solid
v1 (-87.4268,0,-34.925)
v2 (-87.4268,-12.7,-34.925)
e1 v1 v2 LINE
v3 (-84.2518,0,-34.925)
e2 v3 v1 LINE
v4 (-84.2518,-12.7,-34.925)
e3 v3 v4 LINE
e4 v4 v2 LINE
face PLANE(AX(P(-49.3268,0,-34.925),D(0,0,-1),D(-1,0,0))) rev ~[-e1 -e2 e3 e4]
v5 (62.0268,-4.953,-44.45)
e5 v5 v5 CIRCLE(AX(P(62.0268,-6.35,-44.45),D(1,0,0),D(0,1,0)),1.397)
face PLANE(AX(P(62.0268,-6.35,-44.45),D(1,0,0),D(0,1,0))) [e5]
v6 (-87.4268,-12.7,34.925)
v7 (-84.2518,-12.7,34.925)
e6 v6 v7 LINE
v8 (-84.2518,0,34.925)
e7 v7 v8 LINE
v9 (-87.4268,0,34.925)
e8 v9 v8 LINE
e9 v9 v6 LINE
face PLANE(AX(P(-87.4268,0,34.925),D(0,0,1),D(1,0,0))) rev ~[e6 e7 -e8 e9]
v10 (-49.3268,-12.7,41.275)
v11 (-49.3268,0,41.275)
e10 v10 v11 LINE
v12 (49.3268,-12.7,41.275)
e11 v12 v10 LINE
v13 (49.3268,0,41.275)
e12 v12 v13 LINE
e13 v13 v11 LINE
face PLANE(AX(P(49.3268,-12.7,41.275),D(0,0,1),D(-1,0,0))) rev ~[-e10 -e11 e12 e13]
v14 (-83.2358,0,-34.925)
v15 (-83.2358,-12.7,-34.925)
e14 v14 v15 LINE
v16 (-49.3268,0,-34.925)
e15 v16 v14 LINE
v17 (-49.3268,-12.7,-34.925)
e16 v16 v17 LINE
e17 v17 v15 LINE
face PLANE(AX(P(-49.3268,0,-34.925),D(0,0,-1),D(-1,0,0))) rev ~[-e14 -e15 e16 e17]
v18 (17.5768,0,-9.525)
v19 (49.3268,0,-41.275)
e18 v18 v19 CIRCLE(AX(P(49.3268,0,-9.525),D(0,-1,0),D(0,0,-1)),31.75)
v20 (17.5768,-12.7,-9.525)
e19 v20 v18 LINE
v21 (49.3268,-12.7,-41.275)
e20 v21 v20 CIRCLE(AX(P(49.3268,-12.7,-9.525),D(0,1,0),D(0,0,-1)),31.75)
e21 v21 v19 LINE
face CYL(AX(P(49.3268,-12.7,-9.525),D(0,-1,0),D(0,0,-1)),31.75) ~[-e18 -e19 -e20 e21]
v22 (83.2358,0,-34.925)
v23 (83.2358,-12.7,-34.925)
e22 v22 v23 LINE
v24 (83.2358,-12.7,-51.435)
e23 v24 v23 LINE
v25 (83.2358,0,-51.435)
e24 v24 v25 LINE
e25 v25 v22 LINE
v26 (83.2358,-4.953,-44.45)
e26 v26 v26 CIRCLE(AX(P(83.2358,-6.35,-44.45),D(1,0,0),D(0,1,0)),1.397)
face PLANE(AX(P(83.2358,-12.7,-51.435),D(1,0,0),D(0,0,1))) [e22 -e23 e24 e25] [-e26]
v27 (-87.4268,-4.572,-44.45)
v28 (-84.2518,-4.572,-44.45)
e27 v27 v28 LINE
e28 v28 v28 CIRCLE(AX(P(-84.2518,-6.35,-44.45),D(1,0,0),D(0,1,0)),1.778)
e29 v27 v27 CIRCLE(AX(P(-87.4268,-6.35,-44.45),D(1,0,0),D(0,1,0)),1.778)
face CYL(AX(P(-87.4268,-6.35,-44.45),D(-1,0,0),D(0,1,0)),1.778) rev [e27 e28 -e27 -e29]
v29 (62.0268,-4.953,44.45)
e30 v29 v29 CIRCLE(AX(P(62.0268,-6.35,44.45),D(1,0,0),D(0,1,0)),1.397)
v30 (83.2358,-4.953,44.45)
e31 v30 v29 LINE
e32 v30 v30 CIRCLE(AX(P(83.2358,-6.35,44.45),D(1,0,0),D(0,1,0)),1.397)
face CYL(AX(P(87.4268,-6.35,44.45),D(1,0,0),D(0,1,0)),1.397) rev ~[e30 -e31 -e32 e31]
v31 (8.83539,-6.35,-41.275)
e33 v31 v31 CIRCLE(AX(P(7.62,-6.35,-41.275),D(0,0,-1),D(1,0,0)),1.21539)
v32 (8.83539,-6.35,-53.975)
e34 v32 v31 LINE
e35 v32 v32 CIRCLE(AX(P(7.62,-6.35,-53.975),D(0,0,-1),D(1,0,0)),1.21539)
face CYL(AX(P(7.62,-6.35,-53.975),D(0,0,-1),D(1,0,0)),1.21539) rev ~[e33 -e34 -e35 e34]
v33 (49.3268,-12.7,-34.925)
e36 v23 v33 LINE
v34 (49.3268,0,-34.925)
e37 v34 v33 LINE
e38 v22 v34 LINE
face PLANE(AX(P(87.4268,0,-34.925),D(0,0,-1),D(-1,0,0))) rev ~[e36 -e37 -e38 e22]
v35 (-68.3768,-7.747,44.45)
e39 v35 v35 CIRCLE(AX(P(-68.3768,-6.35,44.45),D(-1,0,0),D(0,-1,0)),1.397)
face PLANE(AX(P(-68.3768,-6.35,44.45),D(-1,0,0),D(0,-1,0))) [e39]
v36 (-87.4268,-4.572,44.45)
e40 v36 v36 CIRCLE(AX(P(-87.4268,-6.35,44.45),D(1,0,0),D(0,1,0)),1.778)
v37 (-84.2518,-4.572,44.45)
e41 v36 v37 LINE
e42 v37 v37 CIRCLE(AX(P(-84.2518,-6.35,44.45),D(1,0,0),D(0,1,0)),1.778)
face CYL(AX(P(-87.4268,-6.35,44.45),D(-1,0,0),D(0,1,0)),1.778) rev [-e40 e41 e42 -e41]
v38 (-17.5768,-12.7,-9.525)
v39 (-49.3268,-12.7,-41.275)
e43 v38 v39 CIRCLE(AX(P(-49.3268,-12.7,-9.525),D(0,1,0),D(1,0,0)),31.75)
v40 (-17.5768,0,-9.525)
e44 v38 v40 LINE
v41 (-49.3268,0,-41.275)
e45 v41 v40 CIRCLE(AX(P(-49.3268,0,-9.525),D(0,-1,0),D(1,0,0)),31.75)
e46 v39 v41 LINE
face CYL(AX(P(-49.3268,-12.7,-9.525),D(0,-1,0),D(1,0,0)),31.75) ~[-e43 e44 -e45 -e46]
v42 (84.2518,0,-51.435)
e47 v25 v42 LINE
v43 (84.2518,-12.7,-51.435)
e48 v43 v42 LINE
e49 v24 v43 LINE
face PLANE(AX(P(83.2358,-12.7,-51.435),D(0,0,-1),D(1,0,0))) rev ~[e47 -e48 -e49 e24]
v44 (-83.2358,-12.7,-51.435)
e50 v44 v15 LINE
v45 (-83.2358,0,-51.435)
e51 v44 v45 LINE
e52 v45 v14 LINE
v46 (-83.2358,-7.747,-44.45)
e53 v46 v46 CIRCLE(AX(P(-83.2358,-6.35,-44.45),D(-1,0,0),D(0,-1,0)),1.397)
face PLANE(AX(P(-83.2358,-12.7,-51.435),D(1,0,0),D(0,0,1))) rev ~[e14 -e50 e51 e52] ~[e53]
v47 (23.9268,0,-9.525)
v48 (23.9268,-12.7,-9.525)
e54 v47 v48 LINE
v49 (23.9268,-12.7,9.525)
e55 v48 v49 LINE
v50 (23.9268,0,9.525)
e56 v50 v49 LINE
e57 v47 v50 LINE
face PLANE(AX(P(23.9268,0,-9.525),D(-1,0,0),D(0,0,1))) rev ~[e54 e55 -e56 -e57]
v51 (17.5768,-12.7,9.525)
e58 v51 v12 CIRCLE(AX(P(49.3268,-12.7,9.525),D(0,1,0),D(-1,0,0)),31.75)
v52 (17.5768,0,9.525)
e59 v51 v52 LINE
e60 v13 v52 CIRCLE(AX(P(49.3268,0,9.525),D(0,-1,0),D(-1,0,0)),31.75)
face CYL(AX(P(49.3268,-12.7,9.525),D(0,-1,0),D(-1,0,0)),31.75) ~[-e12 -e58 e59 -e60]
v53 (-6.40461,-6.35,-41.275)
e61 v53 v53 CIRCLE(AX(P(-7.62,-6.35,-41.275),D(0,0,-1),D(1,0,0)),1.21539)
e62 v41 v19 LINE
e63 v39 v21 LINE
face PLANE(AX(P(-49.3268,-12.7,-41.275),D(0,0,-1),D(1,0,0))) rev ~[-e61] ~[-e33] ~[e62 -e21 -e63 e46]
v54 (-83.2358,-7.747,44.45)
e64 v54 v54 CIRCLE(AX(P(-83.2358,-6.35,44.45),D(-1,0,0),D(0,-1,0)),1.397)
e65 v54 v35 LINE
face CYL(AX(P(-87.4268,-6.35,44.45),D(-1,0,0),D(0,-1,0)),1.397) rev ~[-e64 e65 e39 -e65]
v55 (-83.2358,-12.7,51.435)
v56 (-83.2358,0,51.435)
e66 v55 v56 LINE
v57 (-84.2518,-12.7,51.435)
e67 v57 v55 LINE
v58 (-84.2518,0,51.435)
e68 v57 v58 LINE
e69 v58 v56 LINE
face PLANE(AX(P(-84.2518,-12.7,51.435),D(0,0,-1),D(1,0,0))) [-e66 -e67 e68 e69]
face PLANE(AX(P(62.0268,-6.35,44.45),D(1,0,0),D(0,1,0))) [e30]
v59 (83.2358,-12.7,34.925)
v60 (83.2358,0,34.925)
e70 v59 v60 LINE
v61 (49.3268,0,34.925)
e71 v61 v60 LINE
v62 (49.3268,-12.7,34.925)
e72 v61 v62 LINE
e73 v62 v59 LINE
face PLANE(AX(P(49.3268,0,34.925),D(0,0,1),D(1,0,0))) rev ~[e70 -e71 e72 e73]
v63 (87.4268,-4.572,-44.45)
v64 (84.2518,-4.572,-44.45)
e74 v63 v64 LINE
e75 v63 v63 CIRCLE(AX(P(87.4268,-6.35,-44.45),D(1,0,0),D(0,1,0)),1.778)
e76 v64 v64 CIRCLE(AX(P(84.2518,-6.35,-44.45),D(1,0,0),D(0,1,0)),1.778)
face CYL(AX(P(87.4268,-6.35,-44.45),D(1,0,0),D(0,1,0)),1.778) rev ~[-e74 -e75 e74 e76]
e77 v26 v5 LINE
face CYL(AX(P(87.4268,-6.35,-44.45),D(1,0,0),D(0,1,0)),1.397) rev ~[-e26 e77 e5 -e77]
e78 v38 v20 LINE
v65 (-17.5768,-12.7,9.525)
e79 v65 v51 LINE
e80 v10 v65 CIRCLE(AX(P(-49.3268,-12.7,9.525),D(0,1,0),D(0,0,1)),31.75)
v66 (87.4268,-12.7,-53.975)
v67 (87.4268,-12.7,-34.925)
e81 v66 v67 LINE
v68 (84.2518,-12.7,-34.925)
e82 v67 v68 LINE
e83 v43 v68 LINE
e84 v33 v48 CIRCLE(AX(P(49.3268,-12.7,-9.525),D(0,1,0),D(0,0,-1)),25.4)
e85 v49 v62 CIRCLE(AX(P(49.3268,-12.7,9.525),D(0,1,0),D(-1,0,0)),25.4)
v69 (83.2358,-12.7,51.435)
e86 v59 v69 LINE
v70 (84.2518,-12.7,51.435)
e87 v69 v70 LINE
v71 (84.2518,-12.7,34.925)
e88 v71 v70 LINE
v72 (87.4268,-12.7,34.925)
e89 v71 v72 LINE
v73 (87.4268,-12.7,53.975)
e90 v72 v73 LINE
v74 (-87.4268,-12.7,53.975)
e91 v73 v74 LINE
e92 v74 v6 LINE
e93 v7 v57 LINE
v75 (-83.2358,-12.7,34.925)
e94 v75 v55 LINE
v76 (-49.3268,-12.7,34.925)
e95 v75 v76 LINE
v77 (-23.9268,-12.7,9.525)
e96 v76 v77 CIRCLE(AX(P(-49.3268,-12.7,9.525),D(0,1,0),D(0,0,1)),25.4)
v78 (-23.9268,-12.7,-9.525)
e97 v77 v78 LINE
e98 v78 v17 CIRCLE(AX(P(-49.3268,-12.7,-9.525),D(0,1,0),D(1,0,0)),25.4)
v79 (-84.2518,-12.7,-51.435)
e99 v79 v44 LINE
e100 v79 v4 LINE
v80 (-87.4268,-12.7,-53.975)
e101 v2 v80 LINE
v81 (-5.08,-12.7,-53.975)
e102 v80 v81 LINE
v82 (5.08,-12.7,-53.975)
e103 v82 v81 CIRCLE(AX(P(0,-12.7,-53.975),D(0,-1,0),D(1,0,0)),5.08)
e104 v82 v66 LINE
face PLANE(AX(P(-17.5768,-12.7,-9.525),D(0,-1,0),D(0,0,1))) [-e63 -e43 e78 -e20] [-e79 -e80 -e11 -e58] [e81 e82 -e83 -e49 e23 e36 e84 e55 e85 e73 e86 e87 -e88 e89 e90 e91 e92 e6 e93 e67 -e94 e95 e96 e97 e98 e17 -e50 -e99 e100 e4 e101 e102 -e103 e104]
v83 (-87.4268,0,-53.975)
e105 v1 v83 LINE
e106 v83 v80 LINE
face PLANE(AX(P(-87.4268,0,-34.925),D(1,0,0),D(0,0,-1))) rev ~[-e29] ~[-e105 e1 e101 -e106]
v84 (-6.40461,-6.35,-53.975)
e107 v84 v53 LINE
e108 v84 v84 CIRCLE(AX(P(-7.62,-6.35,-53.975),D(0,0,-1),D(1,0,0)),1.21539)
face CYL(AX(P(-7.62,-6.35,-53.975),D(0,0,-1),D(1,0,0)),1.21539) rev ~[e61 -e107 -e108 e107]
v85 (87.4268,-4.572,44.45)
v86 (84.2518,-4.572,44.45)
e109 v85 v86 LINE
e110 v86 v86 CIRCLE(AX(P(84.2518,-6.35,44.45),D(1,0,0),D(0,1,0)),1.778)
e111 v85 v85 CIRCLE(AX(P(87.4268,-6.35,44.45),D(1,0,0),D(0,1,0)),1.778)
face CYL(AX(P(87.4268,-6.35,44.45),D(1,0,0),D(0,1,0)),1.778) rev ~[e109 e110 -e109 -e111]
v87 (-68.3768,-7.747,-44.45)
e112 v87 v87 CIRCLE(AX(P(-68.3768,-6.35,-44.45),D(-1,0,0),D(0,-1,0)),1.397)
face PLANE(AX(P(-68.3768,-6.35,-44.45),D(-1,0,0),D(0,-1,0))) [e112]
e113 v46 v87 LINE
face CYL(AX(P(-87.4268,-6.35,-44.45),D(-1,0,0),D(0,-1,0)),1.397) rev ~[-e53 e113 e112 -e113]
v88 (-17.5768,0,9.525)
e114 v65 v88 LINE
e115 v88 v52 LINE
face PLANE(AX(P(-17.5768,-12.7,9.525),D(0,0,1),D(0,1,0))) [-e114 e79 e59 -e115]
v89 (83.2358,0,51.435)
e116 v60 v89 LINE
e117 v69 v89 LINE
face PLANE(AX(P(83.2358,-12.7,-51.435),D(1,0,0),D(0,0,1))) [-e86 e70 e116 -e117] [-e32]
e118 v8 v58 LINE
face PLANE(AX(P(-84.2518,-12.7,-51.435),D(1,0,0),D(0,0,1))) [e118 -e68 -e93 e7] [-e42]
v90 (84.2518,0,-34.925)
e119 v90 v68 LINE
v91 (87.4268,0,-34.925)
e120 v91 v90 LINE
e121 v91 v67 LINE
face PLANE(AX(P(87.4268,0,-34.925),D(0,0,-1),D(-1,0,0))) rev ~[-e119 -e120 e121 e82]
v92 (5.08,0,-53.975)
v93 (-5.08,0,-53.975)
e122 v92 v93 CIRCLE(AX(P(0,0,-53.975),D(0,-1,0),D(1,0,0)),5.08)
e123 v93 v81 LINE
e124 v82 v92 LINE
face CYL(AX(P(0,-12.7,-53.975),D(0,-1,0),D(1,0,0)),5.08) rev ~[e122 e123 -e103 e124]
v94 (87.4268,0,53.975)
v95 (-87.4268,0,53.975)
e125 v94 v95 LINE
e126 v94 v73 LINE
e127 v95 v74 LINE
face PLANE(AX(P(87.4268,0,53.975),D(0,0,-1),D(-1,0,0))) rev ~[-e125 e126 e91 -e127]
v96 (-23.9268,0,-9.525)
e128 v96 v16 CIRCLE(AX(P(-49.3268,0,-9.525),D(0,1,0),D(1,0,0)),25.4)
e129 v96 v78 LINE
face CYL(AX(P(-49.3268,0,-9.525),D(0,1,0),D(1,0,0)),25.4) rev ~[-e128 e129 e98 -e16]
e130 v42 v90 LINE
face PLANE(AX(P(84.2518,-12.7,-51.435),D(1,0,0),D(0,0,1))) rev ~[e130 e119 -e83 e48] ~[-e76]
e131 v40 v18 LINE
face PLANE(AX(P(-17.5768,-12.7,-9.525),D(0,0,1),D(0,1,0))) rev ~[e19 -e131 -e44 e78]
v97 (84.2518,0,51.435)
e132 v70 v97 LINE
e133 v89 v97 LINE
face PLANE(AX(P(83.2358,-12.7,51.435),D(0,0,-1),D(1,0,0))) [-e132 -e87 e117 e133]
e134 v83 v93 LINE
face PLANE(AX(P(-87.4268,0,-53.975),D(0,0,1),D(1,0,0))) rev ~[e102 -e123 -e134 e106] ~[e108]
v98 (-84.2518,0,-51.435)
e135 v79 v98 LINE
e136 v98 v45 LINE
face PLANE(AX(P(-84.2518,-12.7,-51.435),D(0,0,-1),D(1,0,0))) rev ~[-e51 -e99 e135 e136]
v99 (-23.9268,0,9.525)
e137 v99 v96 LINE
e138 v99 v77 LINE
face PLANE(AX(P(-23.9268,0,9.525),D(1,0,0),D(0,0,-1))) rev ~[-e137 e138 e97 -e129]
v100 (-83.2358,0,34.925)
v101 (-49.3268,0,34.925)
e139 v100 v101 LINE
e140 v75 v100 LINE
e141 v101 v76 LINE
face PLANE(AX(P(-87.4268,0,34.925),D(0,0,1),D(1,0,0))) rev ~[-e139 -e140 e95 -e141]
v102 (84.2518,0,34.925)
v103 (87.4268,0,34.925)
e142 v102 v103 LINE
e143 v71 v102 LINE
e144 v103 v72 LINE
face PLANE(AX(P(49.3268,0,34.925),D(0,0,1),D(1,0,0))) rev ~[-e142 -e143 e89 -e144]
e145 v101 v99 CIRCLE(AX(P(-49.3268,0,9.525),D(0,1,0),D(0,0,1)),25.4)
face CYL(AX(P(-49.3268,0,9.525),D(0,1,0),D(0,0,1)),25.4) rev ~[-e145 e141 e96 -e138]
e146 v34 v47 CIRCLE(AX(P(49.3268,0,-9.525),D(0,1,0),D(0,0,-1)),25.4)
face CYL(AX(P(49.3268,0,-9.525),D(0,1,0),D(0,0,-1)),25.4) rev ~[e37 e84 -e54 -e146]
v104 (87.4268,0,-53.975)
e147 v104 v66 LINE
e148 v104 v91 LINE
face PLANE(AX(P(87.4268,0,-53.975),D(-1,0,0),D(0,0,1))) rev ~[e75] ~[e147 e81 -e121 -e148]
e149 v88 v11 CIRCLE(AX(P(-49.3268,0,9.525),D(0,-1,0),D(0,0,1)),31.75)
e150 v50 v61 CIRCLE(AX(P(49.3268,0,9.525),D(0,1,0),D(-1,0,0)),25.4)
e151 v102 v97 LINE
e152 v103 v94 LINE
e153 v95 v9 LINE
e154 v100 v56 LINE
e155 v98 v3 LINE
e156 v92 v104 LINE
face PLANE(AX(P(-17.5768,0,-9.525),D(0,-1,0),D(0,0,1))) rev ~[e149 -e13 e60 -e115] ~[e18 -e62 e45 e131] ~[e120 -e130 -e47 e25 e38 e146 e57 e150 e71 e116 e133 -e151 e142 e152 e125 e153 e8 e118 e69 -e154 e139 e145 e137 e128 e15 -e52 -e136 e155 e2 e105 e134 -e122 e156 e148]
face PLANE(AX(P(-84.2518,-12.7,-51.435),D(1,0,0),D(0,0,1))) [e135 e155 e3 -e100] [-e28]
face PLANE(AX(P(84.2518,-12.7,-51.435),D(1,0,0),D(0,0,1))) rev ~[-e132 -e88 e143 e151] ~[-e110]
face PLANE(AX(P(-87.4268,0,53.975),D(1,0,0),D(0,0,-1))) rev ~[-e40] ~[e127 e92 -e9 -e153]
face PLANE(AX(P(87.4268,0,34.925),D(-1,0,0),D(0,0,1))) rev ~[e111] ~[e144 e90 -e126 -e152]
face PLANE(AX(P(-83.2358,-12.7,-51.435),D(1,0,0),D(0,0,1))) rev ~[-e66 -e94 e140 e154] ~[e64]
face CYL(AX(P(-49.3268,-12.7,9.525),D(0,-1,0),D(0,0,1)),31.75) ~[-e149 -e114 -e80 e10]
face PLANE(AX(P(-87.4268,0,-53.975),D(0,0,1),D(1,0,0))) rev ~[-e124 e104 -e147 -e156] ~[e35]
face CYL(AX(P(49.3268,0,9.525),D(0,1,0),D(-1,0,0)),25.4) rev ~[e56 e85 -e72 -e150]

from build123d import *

# Parameters (mm, degrees)
F1_DEPTH  = 12.7
F2_W      = 1.016
F2_H      = 102.87
F3_DEPTH  = 25.4
F4_R      = 5.08
F5_DEPTH  = 25.4
F6_R      = 1.21539
F7_DEPTH  = 25.4
F8_R      = 1.397
F9_DEPTH  = 25.4
F10_R     = 1.397
F11_DEPTH = 19.05
F12_R     = 1.778
F13_DEPTH = 3.175
F15_DEPTH = 25.4
F16_W     = 12.7
F16_H     = 19.05
F17_DEPTH = 38.1


# Not quite as in the source:
# - a pattern or mirror of a feature is missing from the dataset's text; its kind, count and spacing are read off the source's solid


with BuildPart() as f1:
    # F0 (on Front) → F1 (new body)
    with BuildSketch(Plane.XZ):
        with BuildLine():
            Line((87.4268, 34.925), (87.4268, 53.975))
            Line((87.4268, 53.975), (0, 53.975))
            Line((0, 53.975), (-87.4268, 53.975))
            Line((-87.4268, 53.975), (-87.4268, 34.925))
            Line((-87.4268, 34.925), (-49.3268, 34.925))
            ThreePointArc((-49.3268, 34.925), (-31.3662877579, 27.4855122421), (-23.9268, 9.525))
            Line((-23.9268, 9.525), (-23.9268, -9.525))
            ThreePointArc((-23.9268, -9.525), (-31.3662877579, -27.4855122421), (-49.3268, -34.925))
            Line((-49.3268, -34.925), (-87.4268, -34.925))
            Line((-87.4268, -34.925), (-87.4268, -53.975))
            Line((-87.4268, -53.975), (87.4268, -53.975))
            Line((87.4268, -53.975), (87.4268, -34.925))
            Line((87.4268, -34.925), (49.3268, -34.925))
            ThreePointArc((49.3268, -34.925), (31.3662877579, -27.4855122421), (23.9268, -9.525))
            Line((23.9268, -9.525), (23.9268, 9.525))
            ThreePointArc((23.9268, 9.525), (31.3662877579, 27.4855122421), (49.3268, 34.925))
            Line((49.3268, 34.925), (87.4268, 34.925))
        make_face()
    extrude(amount=F1_DEPTH)

    # F2 (on face) → F3 (cut)
    with BuildSketch(Plane.XZ.offset(12.7)):
        with Locations((-83.7438, 0)):
            Rectangle(F2_W, F2_H)
        with Locations((83.7438, 0)):
            Rectangle(F2_W, F2_H)
    extrude(amount=-F3_DEPTH, mode=Mode.SUBTRACT)

    # F4 (on face) → F5 (cut)
    with BuildSketch(Plane.XZ.offset(12.7)):
        with Locations((0, -53.975)):
            Circle(F4_R)
    extrude(amount=-F5_DEPTH, mode=Mode.SUBTRACT)

    # F6 (on face) → F7 (cut)
    with BuildSketch(Plane(origin=(0, 0, -53.975), x_dir=(1, 0, 0), z_dir=(0, 0, -1))):
        with Locations((-7.62, 6.35)):
            Circle(F6_R)
        with Locations((7.62, 6.35)):
            Circle(F6_R)
    extrude(amount=-F7_DEPTH, mode=Mode.SUBTRACT)

    # F8 (on face) → F9 (cut)
    with BuildSketch(Plane.YZ.offset(87.4268)):
        with Locations((-6.35, 44.45)):
            Circle(F8_R)
        with Locations((-6.35, -44.45)):
            Circle(F8_R)
    extrude(amount=-F9_DEPTH, mode=Mode.SUBTRACT)

    # F10 (on face) → F11 (cut)
    with BuildSketch(Plane(origin=(-87.4268, 0, 0), x_dir=(0, -1, 0), z_dir=(-1, 0, 0))):
        with Locations((6.35, 44.45)):
            Circle(F10_R)
        with Locations((6.35, -44.45)):
            Circle(F10_R)
    extrude(amount=-F11_DEPTH, mode=Mode.SUBTRACT)

    # F12 (on face) → F13 (cut)
    with BuildSketch(Plane.YZ.offset(87.4268)):
        with Locations((-6.35, 44.45)):
            Circle(F12_R)
        with Locations((-6.35, -44.45)):
            Circle(F12_R)
    f13 = extrude(amount=-F13_DEPTH, mode=Mode.SUBTRACT)

    # F13_copies: F13 across plane
    add(f13.mirror(Plane(origin=(0, 0, 0), x_dir=(0, 0, -1), z_dir=(-1, 0, 0))), mode=Mode.SUBTRACT)

    # F14 (on face) → F15 (cut)
    with BuildSketch(Plane.XZ.offset(12.7)):
        with BuildLine():
            ThreePointArc((-17.5768, -9.525), (-26.8761596973, -31.9756403027), (-49.3268, -41.275))
            Line((-49.3268, -41.275), (49.3268, -41.275))
            ThreePointArc((49.3268, -41.275), (26.8761596973, -31.9756403027), (17.5768, -9.525))
            Line((17.5768, -9.525), (17.5768, 9.525))
            ThreePointArc((17.5768, 9.525), (26.8761596973, 31.9756403027), (49.3268, 41.275))
            Line((49.3268, 41.275), (-49.3268, 41.275))
            ThreePointArc((-49.3268, 41.275), (-26.8761596973, 31.9756403027), (-17.5768, 9.525))
            Line((-17.5768, 9.525), (-17.5768, -9.525))
        make_face()
    extrude(amount=-F15_DEPTH, mode=Mode.SUBTRACT)

    # F16 (on face) → F17 (join)
    with BuildSketch(Plane.YZ.offset(-17.5768)):
        with Locations((-6.35, 0)):
            Rectangle(F16_W, F16_H)
    extrude(amount=F17_DEPTH)


solid = f1.part
